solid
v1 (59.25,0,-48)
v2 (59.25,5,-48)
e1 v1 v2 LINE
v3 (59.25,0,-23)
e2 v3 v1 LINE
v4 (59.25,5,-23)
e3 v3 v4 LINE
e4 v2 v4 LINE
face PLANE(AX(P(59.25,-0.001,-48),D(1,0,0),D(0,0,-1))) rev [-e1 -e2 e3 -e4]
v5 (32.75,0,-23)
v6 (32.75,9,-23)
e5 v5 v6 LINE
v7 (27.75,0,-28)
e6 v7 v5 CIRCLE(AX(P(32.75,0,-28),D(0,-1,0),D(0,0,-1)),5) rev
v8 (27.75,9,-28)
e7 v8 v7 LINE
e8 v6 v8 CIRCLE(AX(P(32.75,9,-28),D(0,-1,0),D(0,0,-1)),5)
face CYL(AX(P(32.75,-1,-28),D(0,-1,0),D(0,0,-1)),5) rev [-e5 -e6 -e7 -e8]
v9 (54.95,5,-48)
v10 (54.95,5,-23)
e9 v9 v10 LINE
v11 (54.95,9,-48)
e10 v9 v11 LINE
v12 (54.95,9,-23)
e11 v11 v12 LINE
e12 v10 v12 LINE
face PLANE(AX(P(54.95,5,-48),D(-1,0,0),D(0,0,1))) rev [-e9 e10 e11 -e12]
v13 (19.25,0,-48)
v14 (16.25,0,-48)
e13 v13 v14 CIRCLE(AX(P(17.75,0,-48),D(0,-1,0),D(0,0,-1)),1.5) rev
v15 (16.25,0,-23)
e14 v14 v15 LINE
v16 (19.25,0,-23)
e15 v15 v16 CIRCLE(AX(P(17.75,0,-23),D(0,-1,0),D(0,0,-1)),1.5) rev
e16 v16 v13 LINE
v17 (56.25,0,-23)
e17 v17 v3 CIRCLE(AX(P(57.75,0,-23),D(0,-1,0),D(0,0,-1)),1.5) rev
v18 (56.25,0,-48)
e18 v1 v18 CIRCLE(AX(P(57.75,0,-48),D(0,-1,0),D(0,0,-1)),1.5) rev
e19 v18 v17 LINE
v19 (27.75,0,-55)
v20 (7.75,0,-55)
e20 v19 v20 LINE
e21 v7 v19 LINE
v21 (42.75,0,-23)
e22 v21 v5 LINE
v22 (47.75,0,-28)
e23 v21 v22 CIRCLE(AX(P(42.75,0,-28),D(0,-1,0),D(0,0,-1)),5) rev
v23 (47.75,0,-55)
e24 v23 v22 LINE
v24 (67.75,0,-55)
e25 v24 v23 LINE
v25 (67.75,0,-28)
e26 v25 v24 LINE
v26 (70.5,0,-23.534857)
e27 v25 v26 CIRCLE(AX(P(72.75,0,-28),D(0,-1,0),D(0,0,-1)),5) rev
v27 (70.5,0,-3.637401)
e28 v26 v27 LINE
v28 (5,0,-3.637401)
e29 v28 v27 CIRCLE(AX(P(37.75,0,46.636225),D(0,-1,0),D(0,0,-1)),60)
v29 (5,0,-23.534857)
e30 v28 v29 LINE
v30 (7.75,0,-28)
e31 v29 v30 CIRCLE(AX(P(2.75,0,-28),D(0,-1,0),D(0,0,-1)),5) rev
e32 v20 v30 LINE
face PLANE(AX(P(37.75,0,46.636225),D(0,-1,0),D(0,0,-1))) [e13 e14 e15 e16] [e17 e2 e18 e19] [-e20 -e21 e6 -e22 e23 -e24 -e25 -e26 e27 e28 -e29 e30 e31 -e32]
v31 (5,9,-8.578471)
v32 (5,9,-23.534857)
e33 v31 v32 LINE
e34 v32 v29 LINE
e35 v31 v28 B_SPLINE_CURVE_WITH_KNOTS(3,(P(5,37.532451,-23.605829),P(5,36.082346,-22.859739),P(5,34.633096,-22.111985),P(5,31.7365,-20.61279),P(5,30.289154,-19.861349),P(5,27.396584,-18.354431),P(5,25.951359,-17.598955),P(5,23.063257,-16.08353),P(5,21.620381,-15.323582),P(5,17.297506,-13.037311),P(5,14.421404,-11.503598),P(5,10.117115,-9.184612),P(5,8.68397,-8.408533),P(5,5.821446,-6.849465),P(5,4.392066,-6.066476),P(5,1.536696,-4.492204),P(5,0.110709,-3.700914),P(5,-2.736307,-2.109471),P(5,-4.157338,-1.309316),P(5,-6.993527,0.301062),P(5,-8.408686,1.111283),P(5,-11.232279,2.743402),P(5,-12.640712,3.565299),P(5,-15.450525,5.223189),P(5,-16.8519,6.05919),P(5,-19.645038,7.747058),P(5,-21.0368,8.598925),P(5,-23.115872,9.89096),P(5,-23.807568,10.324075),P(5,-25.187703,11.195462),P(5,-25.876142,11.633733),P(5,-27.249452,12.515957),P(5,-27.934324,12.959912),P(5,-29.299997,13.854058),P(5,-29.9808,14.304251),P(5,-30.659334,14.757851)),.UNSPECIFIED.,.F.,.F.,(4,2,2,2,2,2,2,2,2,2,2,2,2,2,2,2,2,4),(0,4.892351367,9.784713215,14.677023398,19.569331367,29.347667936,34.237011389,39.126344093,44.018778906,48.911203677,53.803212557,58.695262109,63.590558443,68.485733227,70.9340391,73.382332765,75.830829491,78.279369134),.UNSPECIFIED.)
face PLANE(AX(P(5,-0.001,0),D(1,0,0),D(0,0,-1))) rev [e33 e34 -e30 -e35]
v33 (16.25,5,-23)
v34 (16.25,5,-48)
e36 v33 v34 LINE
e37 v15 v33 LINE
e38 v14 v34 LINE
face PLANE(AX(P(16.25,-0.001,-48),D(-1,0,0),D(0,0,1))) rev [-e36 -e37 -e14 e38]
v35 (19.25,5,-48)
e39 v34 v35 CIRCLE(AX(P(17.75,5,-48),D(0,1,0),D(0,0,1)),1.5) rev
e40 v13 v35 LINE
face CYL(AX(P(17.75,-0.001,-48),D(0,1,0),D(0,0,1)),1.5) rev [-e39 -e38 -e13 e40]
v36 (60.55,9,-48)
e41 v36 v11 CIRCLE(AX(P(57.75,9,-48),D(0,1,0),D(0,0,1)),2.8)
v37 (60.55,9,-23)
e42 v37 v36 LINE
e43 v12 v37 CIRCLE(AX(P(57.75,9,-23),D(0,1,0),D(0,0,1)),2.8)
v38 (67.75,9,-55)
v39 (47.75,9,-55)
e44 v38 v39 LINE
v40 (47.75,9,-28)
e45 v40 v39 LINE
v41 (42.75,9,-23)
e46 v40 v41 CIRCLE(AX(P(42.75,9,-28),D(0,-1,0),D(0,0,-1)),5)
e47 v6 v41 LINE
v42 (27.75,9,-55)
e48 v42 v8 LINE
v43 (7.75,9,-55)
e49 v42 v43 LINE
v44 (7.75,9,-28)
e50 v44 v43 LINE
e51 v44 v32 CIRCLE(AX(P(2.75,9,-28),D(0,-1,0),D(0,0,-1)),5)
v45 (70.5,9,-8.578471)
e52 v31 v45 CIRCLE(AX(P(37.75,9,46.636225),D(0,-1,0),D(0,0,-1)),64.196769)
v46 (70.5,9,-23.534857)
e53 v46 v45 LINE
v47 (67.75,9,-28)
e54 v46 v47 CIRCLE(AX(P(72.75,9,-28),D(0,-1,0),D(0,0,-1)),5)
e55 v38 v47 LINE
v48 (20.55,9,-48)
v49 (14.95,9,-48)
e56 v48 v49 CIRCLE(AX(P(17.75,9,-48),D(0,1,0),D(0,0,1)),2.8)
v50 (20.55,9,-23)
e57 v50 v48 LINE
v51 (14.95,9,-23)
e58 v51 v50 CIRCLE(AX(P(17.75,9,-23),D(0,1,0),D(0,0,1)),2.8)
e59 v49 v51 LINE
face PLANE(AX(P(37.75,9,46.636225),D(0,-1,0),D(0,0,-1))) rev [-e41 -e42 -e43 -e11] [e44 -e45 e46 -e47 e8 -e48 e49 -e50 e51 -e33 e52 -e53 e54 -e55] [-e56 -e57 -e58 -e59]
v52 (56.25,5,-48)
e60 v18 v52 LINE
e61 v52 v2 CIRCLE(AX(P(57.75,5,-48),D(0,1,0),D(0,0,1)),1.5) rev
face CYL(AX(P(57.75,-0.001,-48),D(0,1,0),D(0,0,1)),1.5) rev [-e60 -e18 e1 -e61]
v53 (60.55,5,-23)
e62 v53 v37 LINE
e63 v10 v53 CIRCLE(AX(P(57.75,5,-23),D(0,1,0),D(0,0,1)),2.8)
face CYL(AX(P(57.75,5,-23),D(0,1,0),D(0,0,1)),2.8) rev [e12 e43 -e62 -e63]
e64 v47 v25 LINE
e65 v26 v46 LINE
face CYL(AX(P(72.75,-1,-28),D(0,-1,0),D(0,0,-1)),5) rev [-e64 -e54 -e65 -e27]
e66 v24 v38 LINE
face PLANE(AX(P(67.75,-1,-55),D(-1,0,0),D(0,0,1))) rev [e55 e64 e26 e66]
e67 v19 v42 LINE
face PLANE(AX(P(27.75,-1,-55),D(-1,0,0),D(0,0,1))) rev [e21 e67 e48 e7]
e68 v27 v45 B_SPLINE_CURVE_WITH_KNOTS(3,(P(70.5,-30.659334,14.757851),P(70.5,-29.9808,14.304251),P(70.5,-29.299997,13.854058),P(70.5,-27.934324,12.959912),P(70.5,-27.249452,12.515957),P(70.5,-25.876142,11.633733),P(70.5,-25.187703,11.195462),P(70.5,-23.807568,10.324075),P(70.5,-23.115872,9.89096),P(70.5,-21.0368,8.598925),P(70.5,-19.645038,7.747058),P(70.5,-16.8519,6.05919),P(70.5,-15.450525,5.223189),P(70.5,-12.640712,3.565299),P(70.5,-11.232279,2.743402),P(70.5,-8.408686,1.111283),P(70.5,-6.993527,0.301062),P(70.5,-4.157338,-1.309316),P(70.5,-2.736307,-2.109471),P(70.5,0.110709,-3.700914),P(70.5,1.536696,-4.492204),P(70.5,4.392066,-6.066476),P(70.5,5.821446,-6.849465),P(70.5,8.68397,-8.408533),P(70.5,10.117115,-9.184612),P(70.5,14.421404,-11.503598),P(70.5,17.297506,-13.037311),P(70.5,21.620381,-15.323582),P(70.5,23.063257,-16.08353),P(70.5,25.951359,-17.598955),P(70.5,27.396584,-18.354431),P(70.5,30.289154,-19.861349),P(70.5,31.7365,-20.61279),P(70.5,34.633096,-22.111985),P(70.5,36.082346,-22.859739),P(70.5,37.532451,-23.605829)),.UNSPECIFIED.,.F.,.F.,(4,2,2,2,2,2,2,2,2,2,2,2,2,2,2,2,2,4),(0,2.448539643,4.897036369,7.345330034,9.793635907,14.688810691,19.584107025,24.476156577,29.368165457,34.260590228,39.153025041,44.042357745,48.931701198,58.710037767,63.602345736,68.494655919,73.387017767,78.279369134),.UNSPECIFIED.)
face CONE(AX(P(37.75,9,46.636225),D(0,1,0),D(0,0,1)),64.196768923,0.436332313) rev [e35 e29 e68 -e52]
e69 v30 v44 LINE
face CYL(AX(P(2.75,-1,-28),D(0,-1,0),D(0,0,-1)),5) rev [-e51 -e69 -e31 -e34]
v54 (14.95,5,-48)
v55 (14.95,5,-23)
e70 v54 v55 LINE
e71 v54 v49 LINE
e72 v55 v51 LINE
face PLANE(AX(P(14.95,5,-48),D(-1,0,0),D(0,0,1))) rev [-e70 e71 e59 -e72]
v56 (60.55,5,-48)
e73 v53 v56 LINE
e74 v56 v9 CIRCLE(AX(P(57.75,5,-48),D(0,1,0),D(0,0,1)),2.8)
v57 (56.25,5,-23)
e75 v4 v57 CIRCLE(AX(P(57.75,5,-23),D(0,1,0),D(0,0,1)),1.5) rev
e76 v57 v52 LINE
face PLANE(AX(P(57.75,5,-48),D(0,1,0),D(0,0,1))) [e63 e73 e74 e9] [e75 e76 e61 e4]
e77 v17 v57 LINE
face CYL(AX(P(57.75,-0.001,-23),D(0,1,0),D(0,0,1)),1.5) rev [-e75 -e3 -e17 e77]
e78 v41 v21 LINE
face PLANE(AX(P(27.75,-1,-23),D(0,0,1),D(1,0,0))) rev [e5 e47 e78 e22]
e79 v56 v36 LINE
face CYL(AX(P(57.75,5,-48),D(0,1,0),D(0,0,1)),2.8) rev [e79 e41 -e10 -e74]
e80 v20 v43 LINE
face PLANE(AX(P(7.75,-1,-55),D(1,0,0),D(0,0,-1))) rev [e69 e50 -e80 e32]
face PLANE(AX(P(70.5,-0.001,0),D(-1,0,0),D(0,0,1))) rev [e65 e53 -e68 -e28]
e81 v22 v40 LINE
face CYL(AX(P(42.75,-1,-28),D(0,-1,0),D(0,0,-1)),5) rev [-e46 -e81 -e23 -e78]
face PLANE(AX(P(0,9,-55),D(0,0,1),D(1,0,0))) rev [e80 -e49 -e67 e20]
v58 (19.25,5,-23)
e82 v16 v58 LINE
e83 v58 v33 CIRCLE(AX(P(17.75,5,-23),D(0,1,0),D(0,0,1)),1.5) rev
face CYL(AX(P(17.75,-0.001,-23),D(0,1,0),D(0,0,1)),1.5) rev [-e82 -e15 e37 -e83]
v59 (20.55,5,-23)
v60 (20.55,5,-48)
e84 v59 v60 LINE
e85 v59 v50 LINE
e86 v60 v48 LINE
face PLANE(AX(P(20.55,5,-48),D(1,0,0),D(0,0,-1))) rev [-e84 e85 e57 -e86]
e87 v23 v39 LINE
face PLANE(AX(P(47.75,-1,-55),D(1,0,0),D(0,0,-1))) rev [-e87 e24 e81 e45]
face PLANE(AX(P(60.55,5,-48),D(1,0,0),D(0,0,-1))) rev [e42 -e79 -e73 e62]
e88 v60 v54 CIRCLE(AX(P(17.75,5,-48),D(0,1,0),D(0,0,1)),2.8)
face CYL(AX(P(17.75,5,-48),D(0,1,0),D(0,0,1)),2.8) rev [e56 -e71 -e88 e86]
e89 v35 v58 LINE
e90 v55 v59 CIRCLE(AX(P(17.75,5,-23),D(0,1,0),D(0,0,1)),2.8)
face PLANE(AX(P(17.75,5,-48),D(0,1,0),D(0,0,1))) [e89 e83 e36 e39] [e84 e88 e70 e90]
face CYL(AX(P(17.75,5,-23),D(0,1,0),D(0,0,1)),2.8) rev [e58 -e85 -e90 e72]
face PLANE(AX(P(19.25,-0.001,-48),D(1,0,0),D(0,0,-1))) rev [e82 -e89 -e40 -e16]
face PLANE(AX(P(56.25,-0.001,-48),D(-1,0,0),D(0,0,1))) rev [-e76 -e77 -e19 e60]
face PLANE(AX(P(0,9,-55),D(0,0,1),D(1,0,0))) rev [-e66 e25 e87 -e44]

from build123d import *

# Parameters (mm, degrees)
BOSS_EXTRUDE1_DEPTH = 9
CUT_EXTRUDE2_REACH  = 95.842
SKETCH5_W           = 20
SKETCH5_H           = 32
SKETCH5_W_2         = 7.75
CUT_EXTRUDE3_DEPTH  = 10
FILLET1_R           = 5
CUT_EXTRUDE4_DEPTH  = 4
CHAMFER1_SIZE       = 9
CHAMFER1_SIZE_2     = 4.196768923
CUT_EXTRUDE5_REACH  = 95.842
SKETCH7_W           = 5
SKETCH7_H           = 33.085129134
SKETCH7_H_2         = 33.745309592


with BuildPart() as part:
    # Sketch1 → Boss-Extrude1 (new body)
    with BuildSketch(Plane(origin=(0, 0, 0), x_dir=(1, 0, 0), z_dir=(0, 1, 0))):
        with BuildLine():
            Line((0, 0), (0, 55))
            Line((0, 55), (75.5, 55))
            Line((75.5, 55), (75.5, 0))
            ThreePointArc((75.5, 0), (37.75, 13.36377481), (0, 0))
        make_face()
    extrude(amount=BOSS_EXTRUDE1_DEPTH)

    # Sketch4 → Cut-Extrude2 (cut, up to next)
    with BuildSketch(Plane(origin=(0, 9, 0), x_dir=(1, 0, 0), z_dir=(0, 1, 0)), mode=Mode.PRIVATE) as cut_extrude2_sk1:
        with BuildLine():
            Line((19.25, 48), (19.25, 23))
            ThreePointArc((19.25, 23), (17.75, 21.5), (16.25, 23))
            Line((16.25, 23), (16.25, 48))
            ThreePointArc((16.25, 48), (17.75, 49.5), (19.25, 48))
        make_face()
    cut_extrude2_tool1 = extrude(cut_extrude2_sk1.sketch, amount=-CUT_EXTRUDE2_REACH, mode=Mode.PRIVATE) & part.part
    # Sketch4 → Cut-Extrude2 (cut, up to next)
    with BuildSketch(Plane(origin=(0, 9, 0), x_dir=(1, 0, 0), z_dir=(0, 1, 0)), mode=Mode.PRIVATE) as cut_extrude2_sk2:
        with BuildLine():
            Line((59.25, 48), (59.25, 23))
            ThreePointArc((59.25, 23), (57.75, 21.5), (56.25, 23))
            Line((56.25, 23), (56.25, 48))
            ThreePointArc((56.25, 48), (57.75, 49.5), (59.25, 48))
        make_face()
    cut_extrude2_tool2 = extrude(cut_extrude2_sk2.sketch, amount=-CUT_EXTRUDE2_REACH, mode=Mode.PRIVATE) & part.part
    add(cut_extrude2_tool1.solids().sort_by_distance((17.75, 9, -35.5))[0], mode=Mode.SUBTRACT)
    add(cut_extrude2_tool2.solids().sort_by_distance((57.75, 9, -35.5))[0], mode=Mode.SUBTRACT)

    # Sketch5 → Cut-Extrude3 (cut)
    with BuildSketch(Plane(origin=(0, 9, 0), x_dir=(1, 0, 0), z_dir=(0, 1, 0))):
        with Locations((37.75, 39)):
            Rectangle(SKETCH5_W, SKETCH5_H)
        with Locations((71.625, 39)):
            Rectangle(SKETCH5_W_2, SKETCH5_H)
        with Locations((3.875, 39)):
            Rectangle(SKETCH5_W_2, SKETCH5_H)
    extrude(amount=-CUT_EXTRUDE3_DEPTH, mode=Mode.SUBTRACT)

    # Fillet1
    fillet1_edges = [part.edges().sort_by_distance(p)[0] for p in [
        (27.75, 4.5, -23),
        (47.75, 4.5, -23),
        (7.75, 4.5, -23),
        (67.75, 4.5, -23),
    ]]
    fillet(fillet1_edges, radius=FILLET1_R)

    # Sketch6 → Cut-Extrude4 (cut)
    with BuildSketch(Plane(origin=(0, 9, 0), x_dir=(1, 0, 0), z_dir=(0, 1, 0))):
        with BuildLine():
            Line((20.55, 48), (20.55, 23))
            ThreePointArc((20.55, 23), (17.75, 20.2), (14.95, 23))
            Line((14.95, 23), (14.95, 48))
            ThreePointArc((14.95, 48), (17.75, 50.8), (20.55, 48))
        make_face()
        with BuildLine():
            Line((60.55, 48), (60.55, 23))
            ThreePointArc((60.55, 23), (57.75, 20.2), (54.95, 23))
            Line((54.95, 23), (54.95, 48))
            ThreePointArc((54.95, 48), (57.75, 50.8), (60.55, 48))
        make_face()
    extrude(amount=-CUT_EXTRUDE4_DEPTH, mode=Mode.SUBTRACT)

    # Chamfer1
    # the kernel refuses this chamfer: 9, 4.196768923 mm, written as the material it takes off along each edge
    with BuildSketch(Plane(origin=(37.75, 9, 46.63622519), x_dir=(0.8768373409785211, 0, -0.4807871436152561), z_dir=(0.4807871436152561, 0, 0.8768373409785211))) as chamfer1_piece_1:
        Polygon((60, -CHAMFER1_SIZE), (60 + CHAMFER1_SIZE_2, 0), (60, 0), align=None)
    revolve(axis=Axis((37.75, 9, 46.63622519), (0, 1, 0)), revolution_arc=122.526351541, mode=Mode.SUBTRACT)

    # Sketch7 → Cut-Extrude5 (cut, up to next)
    with BuildSketch(Plane(origin=(0, 9, 0), x_dir=(1, 0, 0), z_dir=(0, 1, 0)), mode=Mode.PRIVATE) as cut_extrude5_sk1:
        with Locations((2.5, 16.542564567)):
            Rectangle(SKETCH7_W, SKETCH7_H)
    cut_extrude5_tool1 = extrude(cut_extrude5_sk1.sketch, amount=-CUT_EXTRUDE5_REACH, mode=Mode.PRIVATE) & part.part
    # Sketch7 → Cut-Extrude5 (cut, up to next)
    with BuildSketch(Plane(origin=(0, 9, 0), x_dir=(1, 0, 0), z_dir=(0, 1, 0)), mode=Mode.PRIVATE) as cut_extrude5_sk2:
        with Locations((73, 16.872654796)):
            Rectangle(SKETCH7_W, SKETCH7_H_2)
    cut_extrude5_tool2 = extrude(cut_extrude5_sk2.sketch, amount=-CUT_EXTRUDE5_REACH, mode=Mode.PRIVATE) & part.part
    add(cut_extrude5_tool1.solids().sort_by_distance((2.5, 9, -16.542565))[0], mode=Mode.SUBTRACT)
    add(cut_extrude5_tool2.solids().sort_by_distance((73, 9, -16.872655))[0], mode=Mode.SUBTRACT)


solid = part.part
